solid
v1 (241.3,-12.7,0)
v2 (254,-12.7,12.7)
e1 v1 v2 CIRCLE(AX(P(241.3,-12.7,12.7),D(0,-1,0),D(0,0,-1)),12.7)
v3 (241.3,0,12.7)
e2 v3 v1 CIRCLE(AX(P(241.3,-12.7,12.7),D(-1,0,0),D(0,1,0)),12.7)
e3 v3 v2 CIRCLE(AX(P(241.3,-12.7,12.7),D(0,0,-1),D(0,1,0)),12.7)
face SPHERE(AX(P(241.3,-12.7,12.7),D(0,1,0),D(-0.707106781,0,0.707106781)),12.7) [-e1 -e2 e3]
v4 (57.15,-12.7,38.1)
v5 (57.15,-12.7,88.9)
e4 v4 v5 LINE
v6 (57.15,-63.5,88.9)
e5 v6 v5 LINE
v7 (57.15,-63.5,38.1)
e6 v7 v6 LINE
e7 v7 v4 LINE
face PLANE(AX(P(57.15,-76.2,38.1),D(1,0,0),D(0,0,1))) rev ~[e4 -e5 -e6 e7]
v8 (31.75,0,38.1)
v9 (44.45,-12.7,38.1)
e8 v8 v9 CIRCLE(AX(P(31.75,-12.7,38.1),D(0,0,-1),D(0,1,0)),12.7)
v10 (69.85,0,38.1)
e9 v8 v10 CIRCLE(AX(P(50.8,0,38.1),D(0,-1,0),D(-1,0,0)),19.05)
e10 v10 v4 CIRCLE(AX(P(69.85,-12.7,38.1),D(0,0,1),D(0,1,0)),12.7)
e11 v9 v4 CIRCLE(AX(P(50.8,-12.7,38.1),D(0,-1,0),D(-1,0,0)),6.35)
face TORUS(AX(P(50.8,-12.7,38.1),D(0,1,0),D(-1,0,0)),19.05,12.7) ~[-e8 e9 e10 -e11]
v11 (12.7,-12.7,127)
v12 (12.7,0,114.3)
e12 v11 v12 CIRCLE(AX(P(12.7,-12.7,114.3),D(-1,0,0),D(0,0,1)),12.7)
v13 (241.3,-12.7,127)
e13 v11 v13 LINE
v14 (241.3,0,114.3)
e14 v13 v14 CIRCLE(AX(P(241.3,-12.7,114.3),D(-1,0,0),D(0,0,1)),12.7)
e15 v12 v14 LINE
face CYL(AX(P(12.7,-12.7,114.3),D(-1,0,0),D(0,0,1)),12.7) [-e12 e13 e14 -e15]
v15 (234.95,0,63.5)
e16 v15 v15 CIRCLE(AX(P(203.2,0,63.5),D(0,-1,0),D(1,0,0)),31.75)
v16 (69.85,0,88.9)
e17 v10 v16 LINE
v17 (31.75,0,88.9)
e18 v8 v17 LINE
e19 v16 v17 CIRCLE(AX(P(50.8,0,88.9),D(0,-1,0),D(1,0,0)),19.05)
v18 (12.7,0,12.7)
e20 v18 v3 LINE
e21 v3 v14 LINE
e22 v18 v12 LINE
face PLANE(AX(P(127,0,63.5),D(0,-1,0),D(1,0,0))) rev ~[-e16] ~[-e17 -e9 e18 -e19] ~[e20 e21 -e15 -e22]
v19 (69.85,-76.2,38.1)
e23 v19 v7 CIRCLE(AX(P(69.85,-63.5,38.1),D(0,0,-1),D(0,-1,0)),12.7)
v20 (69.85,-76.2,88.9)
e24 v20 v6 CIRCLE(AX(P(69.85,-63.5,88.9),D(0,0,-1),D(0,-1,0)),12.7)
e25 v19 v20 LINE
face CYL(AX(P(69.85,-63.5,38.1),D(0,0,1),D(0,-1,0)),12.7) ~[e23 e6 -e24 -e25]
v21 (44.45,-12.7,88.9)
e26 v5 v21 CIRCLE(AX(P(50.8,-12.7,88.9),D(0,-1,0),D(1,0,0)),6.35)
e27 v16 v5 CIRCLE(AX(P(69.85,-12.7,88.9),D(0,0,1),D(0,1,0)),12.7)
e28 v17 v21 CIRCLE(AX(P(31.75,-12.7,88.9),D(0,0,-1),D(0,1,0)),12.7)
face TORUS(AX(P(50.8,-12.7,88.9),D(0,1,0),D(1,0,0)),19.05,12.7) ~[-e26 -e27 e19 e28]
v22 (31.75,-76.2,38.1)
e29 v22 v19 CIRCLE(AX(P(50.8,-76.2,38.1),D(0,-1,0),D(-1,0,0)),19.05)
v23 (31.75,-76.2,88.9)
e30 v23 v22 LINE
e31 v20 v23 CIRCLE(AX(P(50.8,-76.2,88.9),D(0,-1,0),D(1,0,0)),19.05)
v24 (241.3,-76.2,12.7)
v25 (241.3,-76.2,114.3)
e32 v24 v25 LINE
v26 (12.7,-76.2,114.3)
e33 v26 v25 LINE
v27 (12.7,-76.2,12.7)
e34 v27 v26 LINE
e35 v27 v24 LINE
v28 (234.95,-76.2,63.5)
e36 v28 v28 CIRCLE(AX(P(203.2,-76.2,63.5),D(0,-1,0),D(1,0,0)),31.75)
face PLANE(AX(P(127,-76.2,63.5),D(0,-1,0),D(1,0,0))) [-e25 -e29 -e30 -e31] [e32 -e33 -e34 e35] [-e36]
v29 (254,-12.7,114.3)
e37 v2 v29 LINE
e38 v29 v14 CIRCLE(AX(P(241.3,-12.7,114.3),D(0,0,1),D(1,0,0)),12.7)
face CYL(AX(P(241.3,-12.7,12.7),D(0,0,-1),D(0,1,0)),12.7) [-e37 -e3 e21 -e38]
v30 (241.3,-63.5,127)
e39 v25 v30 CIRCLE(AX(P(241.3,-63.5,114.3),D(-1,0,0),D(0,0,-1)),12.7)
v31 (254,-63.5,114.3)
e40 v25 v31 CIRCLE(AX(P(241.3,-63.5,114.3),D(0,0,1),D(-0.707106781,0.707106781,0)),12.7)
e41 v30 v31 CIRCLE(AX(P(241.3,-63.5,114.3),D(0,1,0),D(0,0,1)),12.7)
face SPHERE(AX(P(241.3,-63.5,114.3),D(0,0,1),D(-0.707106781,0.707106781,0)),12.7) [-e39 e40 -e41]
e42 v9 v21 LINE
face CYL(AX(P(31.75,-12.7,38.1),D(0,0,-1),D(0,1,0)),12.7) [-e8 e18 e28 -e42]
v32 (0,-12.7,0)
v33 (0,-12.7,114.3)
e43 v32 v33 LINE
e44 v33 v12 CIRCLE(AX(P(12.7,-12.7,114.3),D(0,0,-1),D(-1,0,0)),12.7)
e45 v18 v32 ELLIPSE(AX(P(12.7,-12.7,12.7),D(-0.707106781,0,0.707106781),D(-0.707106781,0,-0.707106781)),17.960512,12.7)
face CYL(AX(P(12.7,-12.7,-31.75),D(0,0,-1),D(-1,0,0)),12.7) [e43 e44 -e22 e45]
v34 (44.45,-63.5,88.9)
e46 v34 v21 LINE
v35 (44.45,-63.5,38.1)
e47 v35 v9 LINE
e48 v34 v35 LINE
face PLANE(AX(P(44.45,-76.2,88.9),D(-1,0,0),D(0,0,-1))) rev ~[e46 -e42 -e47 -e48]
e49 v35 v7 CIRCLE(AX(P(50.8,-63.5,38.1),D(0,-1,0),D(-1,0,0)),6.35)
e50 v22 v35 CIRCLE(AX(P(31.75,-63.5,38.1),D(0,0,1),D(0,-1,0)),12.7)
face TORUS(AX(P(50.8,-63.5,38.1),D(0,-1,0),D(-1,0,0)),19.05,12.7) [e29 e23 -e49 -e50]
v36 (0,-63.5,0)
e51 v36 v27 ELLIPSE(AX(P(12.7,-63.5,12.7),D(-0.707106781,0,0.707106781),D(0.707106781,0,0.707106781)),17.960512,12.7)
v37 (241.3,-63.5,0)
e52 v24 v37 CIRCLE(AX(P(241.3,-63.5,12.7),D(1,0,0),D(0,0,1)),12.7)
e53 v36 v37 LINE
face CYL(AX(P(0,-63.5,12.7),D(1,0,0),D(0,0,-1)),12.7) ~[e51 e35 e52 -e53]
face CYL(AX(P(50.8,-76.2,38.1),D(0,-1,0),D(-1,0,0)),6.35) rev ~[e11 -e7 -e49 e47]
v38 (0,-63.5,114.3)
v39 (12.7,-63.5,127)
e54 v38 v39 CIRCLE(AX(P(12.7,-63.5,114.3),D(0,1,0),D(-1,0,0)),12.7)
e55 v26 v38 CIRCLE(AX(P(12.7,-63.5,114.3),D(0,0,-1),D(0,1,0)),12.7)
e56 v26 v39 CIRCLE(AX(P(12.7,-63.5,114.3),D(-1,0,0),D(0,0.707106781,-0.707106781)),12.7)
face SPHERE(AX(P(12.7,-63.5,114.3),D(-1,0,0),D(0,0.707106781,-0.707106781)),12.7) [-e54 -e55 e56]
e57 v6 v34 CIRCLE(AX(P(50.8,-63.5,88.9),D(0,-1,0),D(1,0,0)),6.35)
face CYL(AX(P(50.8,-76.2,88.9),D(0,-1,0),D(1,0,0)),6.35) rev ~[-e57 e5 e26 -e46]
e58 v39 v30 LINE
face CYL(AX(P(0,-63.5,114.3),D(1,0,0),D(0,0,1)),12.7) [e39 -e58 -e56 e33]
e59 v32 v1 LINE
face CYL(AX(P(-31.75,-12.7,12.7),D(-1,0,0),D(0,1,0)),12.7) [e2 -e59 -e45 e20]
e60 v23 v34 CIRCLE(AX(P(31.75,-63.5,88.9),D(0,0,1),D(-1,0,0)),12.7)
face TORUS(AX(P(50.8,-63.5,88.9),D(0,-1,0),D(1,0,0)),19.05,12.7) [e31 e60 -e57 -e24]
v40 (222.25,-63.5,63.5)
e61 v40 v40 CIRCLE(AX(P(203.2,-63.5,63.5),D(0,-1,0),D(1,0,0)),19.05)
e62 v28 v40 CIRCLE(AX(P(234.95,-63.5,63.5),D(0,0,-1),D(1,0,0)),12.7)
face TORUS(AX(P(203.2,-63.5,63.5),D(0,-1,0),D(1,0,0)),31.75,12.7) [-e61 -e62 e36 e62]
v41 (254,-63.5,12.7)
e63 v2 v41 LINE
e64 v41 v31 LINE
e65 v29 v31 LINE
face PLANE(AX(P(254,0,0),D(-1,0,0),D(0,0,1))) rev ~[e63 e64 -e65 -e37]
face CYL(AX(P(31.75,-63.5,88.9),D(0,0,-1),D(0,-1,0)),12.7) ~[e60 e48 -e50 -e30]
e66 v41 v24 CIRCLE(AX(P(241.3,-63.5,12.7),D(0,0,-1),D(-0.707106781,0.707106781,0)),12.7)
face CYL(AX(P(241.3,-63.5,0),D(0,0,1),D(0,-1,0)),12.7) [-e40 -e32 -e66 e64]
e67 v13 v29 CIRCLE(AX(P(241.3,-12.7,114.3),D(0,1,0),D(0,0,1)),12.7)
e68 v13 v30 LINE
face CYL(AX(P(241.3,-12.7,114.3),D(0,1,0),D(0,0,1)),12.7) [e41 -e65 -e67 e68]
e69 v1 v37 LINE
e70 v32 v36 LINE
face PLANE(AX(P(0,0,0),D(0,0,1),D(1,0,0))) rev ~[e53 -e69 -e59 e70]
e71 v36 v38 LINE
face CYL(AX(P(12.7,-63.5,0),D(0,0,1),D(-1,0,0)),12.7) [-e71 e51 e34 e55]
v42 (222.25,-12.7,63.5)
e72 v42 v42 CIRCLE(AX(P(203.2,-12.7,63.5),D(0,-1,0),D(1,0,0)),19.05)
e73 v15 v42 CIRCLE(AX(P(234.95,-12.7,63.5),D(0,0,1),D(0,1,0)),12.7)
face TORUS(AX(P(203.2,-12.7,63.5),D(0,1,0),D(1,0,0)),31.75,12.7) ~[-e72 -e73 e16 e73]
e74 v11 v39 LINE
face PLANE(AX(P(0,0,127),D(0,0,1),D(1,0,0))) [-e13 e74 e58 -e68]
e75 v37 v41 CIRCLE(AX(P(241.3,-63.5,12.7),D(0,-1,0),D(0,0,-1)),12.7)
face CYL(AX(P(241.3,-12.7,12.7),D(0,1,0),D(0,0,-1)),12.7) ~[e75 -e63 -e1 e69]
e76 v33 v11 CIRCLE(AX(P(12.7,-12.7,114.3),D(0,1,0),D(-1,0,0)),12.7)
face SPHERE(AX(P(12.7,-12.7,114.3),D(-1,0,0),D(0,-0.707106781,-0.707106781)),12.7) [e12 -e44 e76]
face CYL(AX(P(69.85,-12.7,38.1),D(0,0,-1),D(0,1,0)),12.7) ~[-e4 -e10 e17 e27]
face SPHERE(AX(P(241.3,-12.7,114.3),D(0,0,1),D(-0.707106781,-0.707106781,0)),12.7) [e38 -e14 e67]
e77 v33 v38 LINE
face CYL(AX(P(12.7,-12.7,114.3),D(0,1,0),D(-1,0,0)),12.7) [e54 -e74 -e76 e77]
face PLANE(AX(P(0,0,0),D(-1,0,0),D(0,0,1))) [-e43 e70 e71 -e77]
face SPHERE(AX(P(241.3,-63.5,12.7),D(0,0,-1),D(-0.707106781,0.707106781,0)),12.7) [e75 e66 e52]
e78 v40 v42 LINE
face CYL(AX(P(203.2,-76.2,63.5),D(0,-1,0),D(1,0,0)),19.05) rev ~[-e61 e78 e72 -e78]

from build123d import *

# Parameters (mm, degrees)
F0_W         = 254
F0_H         = 127
F1_DEPTH     = 76.2
F2_R         = 19.05
F3_DEPTH     = 76.201
F5_DEPTH     = 76.201
F6_R         = 12.7
F7_T1_DEPTH  = 228.6
F7_T3_DEPTH  = 50.8
F7_T5_DEPTH  = 101.6
F7_T7_DEPTH  = 273.05
F7_T9_DEPTH  = 146.05
F7_T11_DEPTH = 50.8
F7_S15_W     = 12.7
F7_S15_H     = 12.7
F7_T16_DEPTH = 12.7
F7_S21_W     = 12.7
F7_S21_H     = 12.7
F7_T22_DEPTH = 12.7
F7_S27_W     = 12.7
F7_S27_H     = 12.7
F7_T28_DEPTH = 12.7
F7_S33_W     = 12.7
F7_S33_H     = 12.7
F7_T34_DEPTH = 12.7
F7_S39_W     = 12.7
F7_S39_H     = 12.7
F7_T40_DEPTH = 12.7
F7_S45_W     = 12.7
F7_S45_H     = 12.7
F7_T46_DEPTH = 12.7
F7_T50_ANGLE = 180
F7_T52_ANGLE = 180


# Not quite as in the source:
# - a fillet or chamfer that OpenCascade refuses, or shapes differently, is made with other operations: its cross-section is extruded or revolved along the edge and cut away or added


with BuildPart() as f1:
    # F0 (on Front) → F1 (new body)
    with BuildSketch(Plane.XZ):
        with Locations((127, 63.5)):
            Rectangle(F0_W, F0_H)
    extrude(amount=F1_DEPTH)

    # F2 (on face) → F3 (cut, through all)
    with BuildSketch(Plane.XZ.offset(76.2)):
        with Locations((203.2, 63.5)):
            Circle(F2_R)
    extrude(amount=-F3_DEPTH, mode=Mode.SUBTRACT)

    # F4 (on face) → F5 (cut, through all)
    with BuildSketch(Plane.XZ.offset(76.2)):
        with BuildLine():
            Line((57.15, 38.1), (57.15, 88.9))
            ThreePointArc((57.15, 88.9), (50.8, 95.25), (44.45, 88.9))
            Line((44.45, 88.9), (44.45, 38.1))
            ThreePointArc((44.45, 38.1), (50.8, 31.75), (57.15, 38.1))
        make_face()
    extrude(amount=-F5_DEPTH, mode=Mode.SUBTRACT)

    # F6
    f6_edges = [f1.edges().sort_by_distance(p)[0] for p in [
        (0, -76.2, 63.5),
        (127, -76.2, 127),
        (127, -76.2, 0),
        (254, -76.2, 63.5),
        (57.15, -76.2, 63.5),
        (50.8, -76.2, 95.25),
        (44.45, -76.2, 63.5),
        (50.8, -76.2, 31.75),
        (184.15, -76.2, 63.5),
    ]]
    fillet(f6_edges, radius=F6_R)

    # F7: fillet of radius 12.7 on 12 edges, made by hand

    # F7_s2 → F7_t1 (cut)
    with BuildSketch(Plane.YZ.offset(12.7)):
        with BuildLine():
            ThreePointArc((-12.7, 127), (-3.7197438789, 123.2802561211), (0, 114.3))
            Line((0, 114.3), (0, 127))
            Line((0, 127), (-12.7, 127))
        make_face()
    extrude(amount=F7_T1_DEPTH, mode=Mode.SUBTRACT)

    # F7_s4 → F7_t3 (cut)
    with BuildSketch(Plane.XZ.offset(12.7)):
        with BuildLine():
            ThreePointArc((0, 114.3), (3.7197438789, 123.2802561211), (12.7, 127))
            Line((12.7, 127), (0, 127))
            Line((0, 127), (0, 114.3))
        make_face()
        with BuildLine():
            ThreePointArc((241.3, 127), (250.2802561211, 123.2802561211), (254, 114.3))
            Line((254, 114.3), (254, 127))
            Line((254, 127), (241.3, 127))
        make_face()
        with BuildLine():
            ThreePointArc((241.3, 0), (250.2802561211, 3.7197438789), (254, 12.7))
            Line((254, 12.7), (254, 0))
            Line((254, 0), (241.3, 0))
        make_face()
    extrude(amount=F7_T3_DEPTH, mode=Mode.SUBTRACT)

    # F7_s6 → F7_t5 (cut)
    with BuildSketch(Plane.XY.offset(12.7)):
        with BuildLine():
            ThreePointArc((241.3, 0), (250.2802561211, -3.7197438789), (254, -12.7))
            Line((254, -12.7), (254, 0))
            Line((254, 0), (241.3, 0))
        make_face()
    extrude(amount=F7_T5_DEPTH, mode=Mode.SUBTRACT)

    # F7_s8 → F7_t7 (cut)
    with BuildSketch(Plane.YZ.offset(-31.75)):
        with BuildLine():
            ThreePointArc((0, 12.7), (-3.7197438789, 3.7197438789), (-12.7, 0))
            Line((-12.7, 0), (0, 0))
            Line((0, 0), (0, 12.7))
        make_face()
    extrude(amount=F7_T7_DEPTH, mode=Mode.SUBTRACT)

    # F7_s10 → F7_t9 (cut)
    with BuildSketch(Plane.XY.offset(-31.75)):
        with BuildLine():
            ThreePointArc((0, -12.7), (3.7197438789, -3.7197438789), (12.7, 0))
            Line((12.7, 0), (0, 0))
            Line((0, 0), (0, -12.7))
        make_face()
    extrude(amount=F7_T9_DEPTH, mode=Mode.SUBTRACT)

    # F7_s12 → F7_t11 (cut)
    with BuildSketch(Plane.XY.offset(38.1)):
        with BuildLine():
            ThreePointArc((31.75, 0), (40.7302561211, -3.7197438789), (44.45, -12.7))
            Line((44.45, -12.7), (44.45, 0))
            Line((44.45, 0), (31.75, 0))
        make_face()
        with BuildLine():
            ThreePointArc((69.85, 0), (60.8697438789, -3.7197438789), (57.15, -12.7))
            Line((57.15, -12.7), (57.15, 0))
            Line((57.15, 0), (69.85, 0))
        make_face()
    extrude(amount=F7_T11_DEPTH, mode=Mode.SUBTRACT)


with BuildPart() as f7_tool14:
    # F7_s15 → F7_t16 (new body)
    with BuildSketch(Plane.XY.offset(12.7)):
        with Locations((247.65, -69.85)):
            Rectangle(F7_S15_W, F7_S15_H)
    extrude(amount=-F7_T16_DEPTH)

    # F7_s17 → F7_t18 (revolve, cut)
    with BuildSketch(Plane(origin=(241.3, -63.5, 12.7), x_dir=(-0.7071067812, 0.7071067812, 0), z_dir=(-0.7071067812, -0.7071067812, 0))):
        with BuildLine():
            ThreePointArc((0, -12.7), (12.7, 0), (0, 12.7))
            Line((0, 12.7), (0, -12.7))
        make_face()
    revolve(axis=Axis((241.3, -63.5, 12.7), (0, 0, -1)), mode=Mode.SUBTRACT)


with BuildPart() as f1_1:
    add(f1.part)

    # F7_t13: cut F7_tool14
    add(f7_tool14.part, mode=Mode.SUBTRACT)


with BuildPart() as f7_tool20:
    # F7_s21 → F7_t22 (new body)
    with BuildSketch(Plane.XY.offset(114.3)):
        with Locations((247.65, -69.85)):
            Rectangle(F7_S21_W, F7_S21_H)
    extrude(amount=F7_T22_DEPTH)

    # F7_s23 → F7_t24 (revolve, cut)
    with BuildSketch(Plane(origin=(241.3, -63.5, 114.3), x_dir=(-0.7071067812, 0.7071067812, 0), z_dir=(0.7071067812, 0.7071067812, 0))):
        with BuildLine():
            ThreePointArc((0, -12.7), (12.7, 0), (0, 12.7))
            Line((0, 12.7), (0, -12.7))
        make_face()
    revolve(axis=Axis((241.3, -63.5, 114.3), (0, 0, 1)), mode=Mode.SUBTRACT)


with BuildPart() as f1_2:
    add(f1_1.part)

    # F7_t19: cut F7_tool20
    add(f7_tool20.part, mode=Mode.SUBTRACT)


with BuildPart() as f7_tool26:
    # F7_s27 → F7_t28 (new body)
    with BuildSketch(Plane.YZ.offset(12.7)):
        with Locations((-69.85, 120.65)):
            Rectangle(F7_S27_W, F7_S27_H)
    extrude(amount=-F7_T28_DEPTH)

    # F7_s29 → F7_t30 (revolve, cut)
    with BuildSketch(Plane(origin=(12.7, -63.5, 114.3), x_dir=(0, 0.7071067812, -0.7071067812), z_dir=(0, 0.7071067812, 0.7071067812))):
        with BuildLine():
            ThreePointArc((0, -12.7), (12.7, 0), (0, 12.7))
            Line((0, 12.7), (0, -12.7))
        make_face()
    revolve(axis=Axis((12.7, -63.5, 114.3), (-1, 0, 0)), mode=Mode.SUBTRACT)


with BuildPart() as f1_3:
    add(f1_2.part)

    # F7_t25: cut F7_tool26
    add(f7_tool26.part, mode=Mode.SUBTRACT)


with BuildPart() as f7_tool32:
    # F7_s33 → F7_t34 (new body)
    with BuildSketch(Plane.XY.offset(114.3)):
        with Locations((247.65, -6.35)):
            Rectangle(F7_S33_W, F7_S33_H)
    extrude(amount=F7_T34_DEPTH)

    # F7_s35 → F7_t36 (revolve, cut)
    with BuildSketch(Plane(origin=(241.3, -12.7, 114.3), x_dir=(-0.7071067812, -0.7071067812, 0), z_dir=(-0.7071067812, 0.7071067812, 0))):
        with BuildLine():
            ThreePointArc((0, -12.7), (12.7, 0), (0, 12.7))
            Line((0, 12.7), (0, -12.7))
        make_face()
    revolve(axis=Axis((241.3, -12.7, 114.3), (0, 0, 1)), mode=Mode.SUBTRACT)


with BuildPart() as f1_4:
    add(f1_3.part)

    # F7_t31: cut F7_tool32
    add(f7_tool32.part, mode=Mode.SUBTRACT)


with BuildPart() as f7_tool38:
    # F7_s39 → F7_t40 (new body)
    with BuildSketch(Plane.YZ.offset(12.7)):
        with Locations((-6.35, 120.65)):
            Rectangle(F7_S39_W, F7_S39_H)
    extrude(amount=-F7_T40_DEPTH)

    # F7_s41 → F7_t42 (revolve, cut)
    with BuildSketch(Plane(origin=(12.7, -12.7, 114.3), x_dir=(0, -0.7071067812, -0.7071067812), z_dir=(0, 0.7071067812, -0.7071067812))):
        with BuildLine():
            ThreePointArc((0, -12.7), (12.7, 0), (0, 12.7))
            Line((0, 12.7), (0, -12.7))
        make_face()
    revolve(axis=Axis((12.7, -12.7, 114.3), (-1, 0, 0)), mode=Mode.SUBTRACT)


with BuildPart() as f1_5:
    add(f1_4.part)

    # F7_t37: cut F7_tool38
    add(f7_tool38.part, mode=Mode.SUBTRACT)


with BuildPart() as f7_tool44:
    # F7_s45 → F7_t46 (new body)
    with BuildSketch(Plane.XZ.offset(12.7)):
        with Locations((247.65, 6.35)):
            Rectangle(F7_S45_W, F7_S45_H)
    extrude(amount=-F7_T46_DEPTH)

    # F7_s47 → F7_t48 (revolve, cut)
    with BuildSketch(Plane(origin=(241.3, -12.7, 12.7), x_dir=(-0.7071067812, 0, 0.7071067812), z_dir=(-0.7071067812, 0, -0.7071067812))):
        with BuildLine():
            ThreePointArc((0, -12.7), (12.7, 0), (0, 12.7))
            Line((0, 12.7), (0, -12.7))
        make_face()
    revolve(axis=Axis((241.3, -12.7, 12.7), (0, 1, 0)), mode=Mode.SUBTRACT)


with BuildPart() as f1_6:
    add(f1_5.part)

    # F7_t43: cut F7_tool44
    add(f7_tool44.part, mode=Mode.SUBTRACT)

    # F7_s49 → F7_t50 (revolve, cut)
    with BuildSketch(Plane.XY.offset(38.1)):
        with BuildLine():
            ThreePointArc((31.75, 0), (40.7302561211, -3.7197438789), (44.45, -12.7))
            Line((44.45, -12.7), (44.45, 0))
            Line((44.45, 0), (31.75, 0))
        make_face()
    revolve(axis=Axis((50.8, 0, 38.1), (0, -1, 0)), revolution_arc=F7_T50_ANGLE, mode=Mode.SUBTRACT)

    # F7_s51 → F7_t52 (revolve, cut)
    with BuildSketch(Plane.XY.offset(88.9)):
        with BuildLine():
            ThreePointArc((69.85, 0), (60.8697438789, -3.7197438789), (57.15, -12.7))
            Line((57.15, -12.7), (57.15, 0))
            Line((57.15, 0), (69.85, 0))
        make_face()
    revolve(axis=Axis((50.8, 0, 88.9), (0, -1, 0)), revolution_arc=F7_T52_ANGLE, mode=Mode.SUBTRACT)

    # F7_s53 → F7_t54 (revolve, cut)
    with BuildSketch(Plane.XY.offset(63.5)):
        with BuildLine():
            ThreePointArc((234.95, 0), (225.9697438789, -3.7197438789), (222.25, -12.7))
            Line((222.25, -12.7), (222.25, 0))
            Line((222.25, 0), (234.95, 0))
        make_face()
    revolve(axis=Axis((203.2, 0, 63.5), (0, -1, 0)), mode=Mode.SUBTRACT)


solid = f1_6.part
